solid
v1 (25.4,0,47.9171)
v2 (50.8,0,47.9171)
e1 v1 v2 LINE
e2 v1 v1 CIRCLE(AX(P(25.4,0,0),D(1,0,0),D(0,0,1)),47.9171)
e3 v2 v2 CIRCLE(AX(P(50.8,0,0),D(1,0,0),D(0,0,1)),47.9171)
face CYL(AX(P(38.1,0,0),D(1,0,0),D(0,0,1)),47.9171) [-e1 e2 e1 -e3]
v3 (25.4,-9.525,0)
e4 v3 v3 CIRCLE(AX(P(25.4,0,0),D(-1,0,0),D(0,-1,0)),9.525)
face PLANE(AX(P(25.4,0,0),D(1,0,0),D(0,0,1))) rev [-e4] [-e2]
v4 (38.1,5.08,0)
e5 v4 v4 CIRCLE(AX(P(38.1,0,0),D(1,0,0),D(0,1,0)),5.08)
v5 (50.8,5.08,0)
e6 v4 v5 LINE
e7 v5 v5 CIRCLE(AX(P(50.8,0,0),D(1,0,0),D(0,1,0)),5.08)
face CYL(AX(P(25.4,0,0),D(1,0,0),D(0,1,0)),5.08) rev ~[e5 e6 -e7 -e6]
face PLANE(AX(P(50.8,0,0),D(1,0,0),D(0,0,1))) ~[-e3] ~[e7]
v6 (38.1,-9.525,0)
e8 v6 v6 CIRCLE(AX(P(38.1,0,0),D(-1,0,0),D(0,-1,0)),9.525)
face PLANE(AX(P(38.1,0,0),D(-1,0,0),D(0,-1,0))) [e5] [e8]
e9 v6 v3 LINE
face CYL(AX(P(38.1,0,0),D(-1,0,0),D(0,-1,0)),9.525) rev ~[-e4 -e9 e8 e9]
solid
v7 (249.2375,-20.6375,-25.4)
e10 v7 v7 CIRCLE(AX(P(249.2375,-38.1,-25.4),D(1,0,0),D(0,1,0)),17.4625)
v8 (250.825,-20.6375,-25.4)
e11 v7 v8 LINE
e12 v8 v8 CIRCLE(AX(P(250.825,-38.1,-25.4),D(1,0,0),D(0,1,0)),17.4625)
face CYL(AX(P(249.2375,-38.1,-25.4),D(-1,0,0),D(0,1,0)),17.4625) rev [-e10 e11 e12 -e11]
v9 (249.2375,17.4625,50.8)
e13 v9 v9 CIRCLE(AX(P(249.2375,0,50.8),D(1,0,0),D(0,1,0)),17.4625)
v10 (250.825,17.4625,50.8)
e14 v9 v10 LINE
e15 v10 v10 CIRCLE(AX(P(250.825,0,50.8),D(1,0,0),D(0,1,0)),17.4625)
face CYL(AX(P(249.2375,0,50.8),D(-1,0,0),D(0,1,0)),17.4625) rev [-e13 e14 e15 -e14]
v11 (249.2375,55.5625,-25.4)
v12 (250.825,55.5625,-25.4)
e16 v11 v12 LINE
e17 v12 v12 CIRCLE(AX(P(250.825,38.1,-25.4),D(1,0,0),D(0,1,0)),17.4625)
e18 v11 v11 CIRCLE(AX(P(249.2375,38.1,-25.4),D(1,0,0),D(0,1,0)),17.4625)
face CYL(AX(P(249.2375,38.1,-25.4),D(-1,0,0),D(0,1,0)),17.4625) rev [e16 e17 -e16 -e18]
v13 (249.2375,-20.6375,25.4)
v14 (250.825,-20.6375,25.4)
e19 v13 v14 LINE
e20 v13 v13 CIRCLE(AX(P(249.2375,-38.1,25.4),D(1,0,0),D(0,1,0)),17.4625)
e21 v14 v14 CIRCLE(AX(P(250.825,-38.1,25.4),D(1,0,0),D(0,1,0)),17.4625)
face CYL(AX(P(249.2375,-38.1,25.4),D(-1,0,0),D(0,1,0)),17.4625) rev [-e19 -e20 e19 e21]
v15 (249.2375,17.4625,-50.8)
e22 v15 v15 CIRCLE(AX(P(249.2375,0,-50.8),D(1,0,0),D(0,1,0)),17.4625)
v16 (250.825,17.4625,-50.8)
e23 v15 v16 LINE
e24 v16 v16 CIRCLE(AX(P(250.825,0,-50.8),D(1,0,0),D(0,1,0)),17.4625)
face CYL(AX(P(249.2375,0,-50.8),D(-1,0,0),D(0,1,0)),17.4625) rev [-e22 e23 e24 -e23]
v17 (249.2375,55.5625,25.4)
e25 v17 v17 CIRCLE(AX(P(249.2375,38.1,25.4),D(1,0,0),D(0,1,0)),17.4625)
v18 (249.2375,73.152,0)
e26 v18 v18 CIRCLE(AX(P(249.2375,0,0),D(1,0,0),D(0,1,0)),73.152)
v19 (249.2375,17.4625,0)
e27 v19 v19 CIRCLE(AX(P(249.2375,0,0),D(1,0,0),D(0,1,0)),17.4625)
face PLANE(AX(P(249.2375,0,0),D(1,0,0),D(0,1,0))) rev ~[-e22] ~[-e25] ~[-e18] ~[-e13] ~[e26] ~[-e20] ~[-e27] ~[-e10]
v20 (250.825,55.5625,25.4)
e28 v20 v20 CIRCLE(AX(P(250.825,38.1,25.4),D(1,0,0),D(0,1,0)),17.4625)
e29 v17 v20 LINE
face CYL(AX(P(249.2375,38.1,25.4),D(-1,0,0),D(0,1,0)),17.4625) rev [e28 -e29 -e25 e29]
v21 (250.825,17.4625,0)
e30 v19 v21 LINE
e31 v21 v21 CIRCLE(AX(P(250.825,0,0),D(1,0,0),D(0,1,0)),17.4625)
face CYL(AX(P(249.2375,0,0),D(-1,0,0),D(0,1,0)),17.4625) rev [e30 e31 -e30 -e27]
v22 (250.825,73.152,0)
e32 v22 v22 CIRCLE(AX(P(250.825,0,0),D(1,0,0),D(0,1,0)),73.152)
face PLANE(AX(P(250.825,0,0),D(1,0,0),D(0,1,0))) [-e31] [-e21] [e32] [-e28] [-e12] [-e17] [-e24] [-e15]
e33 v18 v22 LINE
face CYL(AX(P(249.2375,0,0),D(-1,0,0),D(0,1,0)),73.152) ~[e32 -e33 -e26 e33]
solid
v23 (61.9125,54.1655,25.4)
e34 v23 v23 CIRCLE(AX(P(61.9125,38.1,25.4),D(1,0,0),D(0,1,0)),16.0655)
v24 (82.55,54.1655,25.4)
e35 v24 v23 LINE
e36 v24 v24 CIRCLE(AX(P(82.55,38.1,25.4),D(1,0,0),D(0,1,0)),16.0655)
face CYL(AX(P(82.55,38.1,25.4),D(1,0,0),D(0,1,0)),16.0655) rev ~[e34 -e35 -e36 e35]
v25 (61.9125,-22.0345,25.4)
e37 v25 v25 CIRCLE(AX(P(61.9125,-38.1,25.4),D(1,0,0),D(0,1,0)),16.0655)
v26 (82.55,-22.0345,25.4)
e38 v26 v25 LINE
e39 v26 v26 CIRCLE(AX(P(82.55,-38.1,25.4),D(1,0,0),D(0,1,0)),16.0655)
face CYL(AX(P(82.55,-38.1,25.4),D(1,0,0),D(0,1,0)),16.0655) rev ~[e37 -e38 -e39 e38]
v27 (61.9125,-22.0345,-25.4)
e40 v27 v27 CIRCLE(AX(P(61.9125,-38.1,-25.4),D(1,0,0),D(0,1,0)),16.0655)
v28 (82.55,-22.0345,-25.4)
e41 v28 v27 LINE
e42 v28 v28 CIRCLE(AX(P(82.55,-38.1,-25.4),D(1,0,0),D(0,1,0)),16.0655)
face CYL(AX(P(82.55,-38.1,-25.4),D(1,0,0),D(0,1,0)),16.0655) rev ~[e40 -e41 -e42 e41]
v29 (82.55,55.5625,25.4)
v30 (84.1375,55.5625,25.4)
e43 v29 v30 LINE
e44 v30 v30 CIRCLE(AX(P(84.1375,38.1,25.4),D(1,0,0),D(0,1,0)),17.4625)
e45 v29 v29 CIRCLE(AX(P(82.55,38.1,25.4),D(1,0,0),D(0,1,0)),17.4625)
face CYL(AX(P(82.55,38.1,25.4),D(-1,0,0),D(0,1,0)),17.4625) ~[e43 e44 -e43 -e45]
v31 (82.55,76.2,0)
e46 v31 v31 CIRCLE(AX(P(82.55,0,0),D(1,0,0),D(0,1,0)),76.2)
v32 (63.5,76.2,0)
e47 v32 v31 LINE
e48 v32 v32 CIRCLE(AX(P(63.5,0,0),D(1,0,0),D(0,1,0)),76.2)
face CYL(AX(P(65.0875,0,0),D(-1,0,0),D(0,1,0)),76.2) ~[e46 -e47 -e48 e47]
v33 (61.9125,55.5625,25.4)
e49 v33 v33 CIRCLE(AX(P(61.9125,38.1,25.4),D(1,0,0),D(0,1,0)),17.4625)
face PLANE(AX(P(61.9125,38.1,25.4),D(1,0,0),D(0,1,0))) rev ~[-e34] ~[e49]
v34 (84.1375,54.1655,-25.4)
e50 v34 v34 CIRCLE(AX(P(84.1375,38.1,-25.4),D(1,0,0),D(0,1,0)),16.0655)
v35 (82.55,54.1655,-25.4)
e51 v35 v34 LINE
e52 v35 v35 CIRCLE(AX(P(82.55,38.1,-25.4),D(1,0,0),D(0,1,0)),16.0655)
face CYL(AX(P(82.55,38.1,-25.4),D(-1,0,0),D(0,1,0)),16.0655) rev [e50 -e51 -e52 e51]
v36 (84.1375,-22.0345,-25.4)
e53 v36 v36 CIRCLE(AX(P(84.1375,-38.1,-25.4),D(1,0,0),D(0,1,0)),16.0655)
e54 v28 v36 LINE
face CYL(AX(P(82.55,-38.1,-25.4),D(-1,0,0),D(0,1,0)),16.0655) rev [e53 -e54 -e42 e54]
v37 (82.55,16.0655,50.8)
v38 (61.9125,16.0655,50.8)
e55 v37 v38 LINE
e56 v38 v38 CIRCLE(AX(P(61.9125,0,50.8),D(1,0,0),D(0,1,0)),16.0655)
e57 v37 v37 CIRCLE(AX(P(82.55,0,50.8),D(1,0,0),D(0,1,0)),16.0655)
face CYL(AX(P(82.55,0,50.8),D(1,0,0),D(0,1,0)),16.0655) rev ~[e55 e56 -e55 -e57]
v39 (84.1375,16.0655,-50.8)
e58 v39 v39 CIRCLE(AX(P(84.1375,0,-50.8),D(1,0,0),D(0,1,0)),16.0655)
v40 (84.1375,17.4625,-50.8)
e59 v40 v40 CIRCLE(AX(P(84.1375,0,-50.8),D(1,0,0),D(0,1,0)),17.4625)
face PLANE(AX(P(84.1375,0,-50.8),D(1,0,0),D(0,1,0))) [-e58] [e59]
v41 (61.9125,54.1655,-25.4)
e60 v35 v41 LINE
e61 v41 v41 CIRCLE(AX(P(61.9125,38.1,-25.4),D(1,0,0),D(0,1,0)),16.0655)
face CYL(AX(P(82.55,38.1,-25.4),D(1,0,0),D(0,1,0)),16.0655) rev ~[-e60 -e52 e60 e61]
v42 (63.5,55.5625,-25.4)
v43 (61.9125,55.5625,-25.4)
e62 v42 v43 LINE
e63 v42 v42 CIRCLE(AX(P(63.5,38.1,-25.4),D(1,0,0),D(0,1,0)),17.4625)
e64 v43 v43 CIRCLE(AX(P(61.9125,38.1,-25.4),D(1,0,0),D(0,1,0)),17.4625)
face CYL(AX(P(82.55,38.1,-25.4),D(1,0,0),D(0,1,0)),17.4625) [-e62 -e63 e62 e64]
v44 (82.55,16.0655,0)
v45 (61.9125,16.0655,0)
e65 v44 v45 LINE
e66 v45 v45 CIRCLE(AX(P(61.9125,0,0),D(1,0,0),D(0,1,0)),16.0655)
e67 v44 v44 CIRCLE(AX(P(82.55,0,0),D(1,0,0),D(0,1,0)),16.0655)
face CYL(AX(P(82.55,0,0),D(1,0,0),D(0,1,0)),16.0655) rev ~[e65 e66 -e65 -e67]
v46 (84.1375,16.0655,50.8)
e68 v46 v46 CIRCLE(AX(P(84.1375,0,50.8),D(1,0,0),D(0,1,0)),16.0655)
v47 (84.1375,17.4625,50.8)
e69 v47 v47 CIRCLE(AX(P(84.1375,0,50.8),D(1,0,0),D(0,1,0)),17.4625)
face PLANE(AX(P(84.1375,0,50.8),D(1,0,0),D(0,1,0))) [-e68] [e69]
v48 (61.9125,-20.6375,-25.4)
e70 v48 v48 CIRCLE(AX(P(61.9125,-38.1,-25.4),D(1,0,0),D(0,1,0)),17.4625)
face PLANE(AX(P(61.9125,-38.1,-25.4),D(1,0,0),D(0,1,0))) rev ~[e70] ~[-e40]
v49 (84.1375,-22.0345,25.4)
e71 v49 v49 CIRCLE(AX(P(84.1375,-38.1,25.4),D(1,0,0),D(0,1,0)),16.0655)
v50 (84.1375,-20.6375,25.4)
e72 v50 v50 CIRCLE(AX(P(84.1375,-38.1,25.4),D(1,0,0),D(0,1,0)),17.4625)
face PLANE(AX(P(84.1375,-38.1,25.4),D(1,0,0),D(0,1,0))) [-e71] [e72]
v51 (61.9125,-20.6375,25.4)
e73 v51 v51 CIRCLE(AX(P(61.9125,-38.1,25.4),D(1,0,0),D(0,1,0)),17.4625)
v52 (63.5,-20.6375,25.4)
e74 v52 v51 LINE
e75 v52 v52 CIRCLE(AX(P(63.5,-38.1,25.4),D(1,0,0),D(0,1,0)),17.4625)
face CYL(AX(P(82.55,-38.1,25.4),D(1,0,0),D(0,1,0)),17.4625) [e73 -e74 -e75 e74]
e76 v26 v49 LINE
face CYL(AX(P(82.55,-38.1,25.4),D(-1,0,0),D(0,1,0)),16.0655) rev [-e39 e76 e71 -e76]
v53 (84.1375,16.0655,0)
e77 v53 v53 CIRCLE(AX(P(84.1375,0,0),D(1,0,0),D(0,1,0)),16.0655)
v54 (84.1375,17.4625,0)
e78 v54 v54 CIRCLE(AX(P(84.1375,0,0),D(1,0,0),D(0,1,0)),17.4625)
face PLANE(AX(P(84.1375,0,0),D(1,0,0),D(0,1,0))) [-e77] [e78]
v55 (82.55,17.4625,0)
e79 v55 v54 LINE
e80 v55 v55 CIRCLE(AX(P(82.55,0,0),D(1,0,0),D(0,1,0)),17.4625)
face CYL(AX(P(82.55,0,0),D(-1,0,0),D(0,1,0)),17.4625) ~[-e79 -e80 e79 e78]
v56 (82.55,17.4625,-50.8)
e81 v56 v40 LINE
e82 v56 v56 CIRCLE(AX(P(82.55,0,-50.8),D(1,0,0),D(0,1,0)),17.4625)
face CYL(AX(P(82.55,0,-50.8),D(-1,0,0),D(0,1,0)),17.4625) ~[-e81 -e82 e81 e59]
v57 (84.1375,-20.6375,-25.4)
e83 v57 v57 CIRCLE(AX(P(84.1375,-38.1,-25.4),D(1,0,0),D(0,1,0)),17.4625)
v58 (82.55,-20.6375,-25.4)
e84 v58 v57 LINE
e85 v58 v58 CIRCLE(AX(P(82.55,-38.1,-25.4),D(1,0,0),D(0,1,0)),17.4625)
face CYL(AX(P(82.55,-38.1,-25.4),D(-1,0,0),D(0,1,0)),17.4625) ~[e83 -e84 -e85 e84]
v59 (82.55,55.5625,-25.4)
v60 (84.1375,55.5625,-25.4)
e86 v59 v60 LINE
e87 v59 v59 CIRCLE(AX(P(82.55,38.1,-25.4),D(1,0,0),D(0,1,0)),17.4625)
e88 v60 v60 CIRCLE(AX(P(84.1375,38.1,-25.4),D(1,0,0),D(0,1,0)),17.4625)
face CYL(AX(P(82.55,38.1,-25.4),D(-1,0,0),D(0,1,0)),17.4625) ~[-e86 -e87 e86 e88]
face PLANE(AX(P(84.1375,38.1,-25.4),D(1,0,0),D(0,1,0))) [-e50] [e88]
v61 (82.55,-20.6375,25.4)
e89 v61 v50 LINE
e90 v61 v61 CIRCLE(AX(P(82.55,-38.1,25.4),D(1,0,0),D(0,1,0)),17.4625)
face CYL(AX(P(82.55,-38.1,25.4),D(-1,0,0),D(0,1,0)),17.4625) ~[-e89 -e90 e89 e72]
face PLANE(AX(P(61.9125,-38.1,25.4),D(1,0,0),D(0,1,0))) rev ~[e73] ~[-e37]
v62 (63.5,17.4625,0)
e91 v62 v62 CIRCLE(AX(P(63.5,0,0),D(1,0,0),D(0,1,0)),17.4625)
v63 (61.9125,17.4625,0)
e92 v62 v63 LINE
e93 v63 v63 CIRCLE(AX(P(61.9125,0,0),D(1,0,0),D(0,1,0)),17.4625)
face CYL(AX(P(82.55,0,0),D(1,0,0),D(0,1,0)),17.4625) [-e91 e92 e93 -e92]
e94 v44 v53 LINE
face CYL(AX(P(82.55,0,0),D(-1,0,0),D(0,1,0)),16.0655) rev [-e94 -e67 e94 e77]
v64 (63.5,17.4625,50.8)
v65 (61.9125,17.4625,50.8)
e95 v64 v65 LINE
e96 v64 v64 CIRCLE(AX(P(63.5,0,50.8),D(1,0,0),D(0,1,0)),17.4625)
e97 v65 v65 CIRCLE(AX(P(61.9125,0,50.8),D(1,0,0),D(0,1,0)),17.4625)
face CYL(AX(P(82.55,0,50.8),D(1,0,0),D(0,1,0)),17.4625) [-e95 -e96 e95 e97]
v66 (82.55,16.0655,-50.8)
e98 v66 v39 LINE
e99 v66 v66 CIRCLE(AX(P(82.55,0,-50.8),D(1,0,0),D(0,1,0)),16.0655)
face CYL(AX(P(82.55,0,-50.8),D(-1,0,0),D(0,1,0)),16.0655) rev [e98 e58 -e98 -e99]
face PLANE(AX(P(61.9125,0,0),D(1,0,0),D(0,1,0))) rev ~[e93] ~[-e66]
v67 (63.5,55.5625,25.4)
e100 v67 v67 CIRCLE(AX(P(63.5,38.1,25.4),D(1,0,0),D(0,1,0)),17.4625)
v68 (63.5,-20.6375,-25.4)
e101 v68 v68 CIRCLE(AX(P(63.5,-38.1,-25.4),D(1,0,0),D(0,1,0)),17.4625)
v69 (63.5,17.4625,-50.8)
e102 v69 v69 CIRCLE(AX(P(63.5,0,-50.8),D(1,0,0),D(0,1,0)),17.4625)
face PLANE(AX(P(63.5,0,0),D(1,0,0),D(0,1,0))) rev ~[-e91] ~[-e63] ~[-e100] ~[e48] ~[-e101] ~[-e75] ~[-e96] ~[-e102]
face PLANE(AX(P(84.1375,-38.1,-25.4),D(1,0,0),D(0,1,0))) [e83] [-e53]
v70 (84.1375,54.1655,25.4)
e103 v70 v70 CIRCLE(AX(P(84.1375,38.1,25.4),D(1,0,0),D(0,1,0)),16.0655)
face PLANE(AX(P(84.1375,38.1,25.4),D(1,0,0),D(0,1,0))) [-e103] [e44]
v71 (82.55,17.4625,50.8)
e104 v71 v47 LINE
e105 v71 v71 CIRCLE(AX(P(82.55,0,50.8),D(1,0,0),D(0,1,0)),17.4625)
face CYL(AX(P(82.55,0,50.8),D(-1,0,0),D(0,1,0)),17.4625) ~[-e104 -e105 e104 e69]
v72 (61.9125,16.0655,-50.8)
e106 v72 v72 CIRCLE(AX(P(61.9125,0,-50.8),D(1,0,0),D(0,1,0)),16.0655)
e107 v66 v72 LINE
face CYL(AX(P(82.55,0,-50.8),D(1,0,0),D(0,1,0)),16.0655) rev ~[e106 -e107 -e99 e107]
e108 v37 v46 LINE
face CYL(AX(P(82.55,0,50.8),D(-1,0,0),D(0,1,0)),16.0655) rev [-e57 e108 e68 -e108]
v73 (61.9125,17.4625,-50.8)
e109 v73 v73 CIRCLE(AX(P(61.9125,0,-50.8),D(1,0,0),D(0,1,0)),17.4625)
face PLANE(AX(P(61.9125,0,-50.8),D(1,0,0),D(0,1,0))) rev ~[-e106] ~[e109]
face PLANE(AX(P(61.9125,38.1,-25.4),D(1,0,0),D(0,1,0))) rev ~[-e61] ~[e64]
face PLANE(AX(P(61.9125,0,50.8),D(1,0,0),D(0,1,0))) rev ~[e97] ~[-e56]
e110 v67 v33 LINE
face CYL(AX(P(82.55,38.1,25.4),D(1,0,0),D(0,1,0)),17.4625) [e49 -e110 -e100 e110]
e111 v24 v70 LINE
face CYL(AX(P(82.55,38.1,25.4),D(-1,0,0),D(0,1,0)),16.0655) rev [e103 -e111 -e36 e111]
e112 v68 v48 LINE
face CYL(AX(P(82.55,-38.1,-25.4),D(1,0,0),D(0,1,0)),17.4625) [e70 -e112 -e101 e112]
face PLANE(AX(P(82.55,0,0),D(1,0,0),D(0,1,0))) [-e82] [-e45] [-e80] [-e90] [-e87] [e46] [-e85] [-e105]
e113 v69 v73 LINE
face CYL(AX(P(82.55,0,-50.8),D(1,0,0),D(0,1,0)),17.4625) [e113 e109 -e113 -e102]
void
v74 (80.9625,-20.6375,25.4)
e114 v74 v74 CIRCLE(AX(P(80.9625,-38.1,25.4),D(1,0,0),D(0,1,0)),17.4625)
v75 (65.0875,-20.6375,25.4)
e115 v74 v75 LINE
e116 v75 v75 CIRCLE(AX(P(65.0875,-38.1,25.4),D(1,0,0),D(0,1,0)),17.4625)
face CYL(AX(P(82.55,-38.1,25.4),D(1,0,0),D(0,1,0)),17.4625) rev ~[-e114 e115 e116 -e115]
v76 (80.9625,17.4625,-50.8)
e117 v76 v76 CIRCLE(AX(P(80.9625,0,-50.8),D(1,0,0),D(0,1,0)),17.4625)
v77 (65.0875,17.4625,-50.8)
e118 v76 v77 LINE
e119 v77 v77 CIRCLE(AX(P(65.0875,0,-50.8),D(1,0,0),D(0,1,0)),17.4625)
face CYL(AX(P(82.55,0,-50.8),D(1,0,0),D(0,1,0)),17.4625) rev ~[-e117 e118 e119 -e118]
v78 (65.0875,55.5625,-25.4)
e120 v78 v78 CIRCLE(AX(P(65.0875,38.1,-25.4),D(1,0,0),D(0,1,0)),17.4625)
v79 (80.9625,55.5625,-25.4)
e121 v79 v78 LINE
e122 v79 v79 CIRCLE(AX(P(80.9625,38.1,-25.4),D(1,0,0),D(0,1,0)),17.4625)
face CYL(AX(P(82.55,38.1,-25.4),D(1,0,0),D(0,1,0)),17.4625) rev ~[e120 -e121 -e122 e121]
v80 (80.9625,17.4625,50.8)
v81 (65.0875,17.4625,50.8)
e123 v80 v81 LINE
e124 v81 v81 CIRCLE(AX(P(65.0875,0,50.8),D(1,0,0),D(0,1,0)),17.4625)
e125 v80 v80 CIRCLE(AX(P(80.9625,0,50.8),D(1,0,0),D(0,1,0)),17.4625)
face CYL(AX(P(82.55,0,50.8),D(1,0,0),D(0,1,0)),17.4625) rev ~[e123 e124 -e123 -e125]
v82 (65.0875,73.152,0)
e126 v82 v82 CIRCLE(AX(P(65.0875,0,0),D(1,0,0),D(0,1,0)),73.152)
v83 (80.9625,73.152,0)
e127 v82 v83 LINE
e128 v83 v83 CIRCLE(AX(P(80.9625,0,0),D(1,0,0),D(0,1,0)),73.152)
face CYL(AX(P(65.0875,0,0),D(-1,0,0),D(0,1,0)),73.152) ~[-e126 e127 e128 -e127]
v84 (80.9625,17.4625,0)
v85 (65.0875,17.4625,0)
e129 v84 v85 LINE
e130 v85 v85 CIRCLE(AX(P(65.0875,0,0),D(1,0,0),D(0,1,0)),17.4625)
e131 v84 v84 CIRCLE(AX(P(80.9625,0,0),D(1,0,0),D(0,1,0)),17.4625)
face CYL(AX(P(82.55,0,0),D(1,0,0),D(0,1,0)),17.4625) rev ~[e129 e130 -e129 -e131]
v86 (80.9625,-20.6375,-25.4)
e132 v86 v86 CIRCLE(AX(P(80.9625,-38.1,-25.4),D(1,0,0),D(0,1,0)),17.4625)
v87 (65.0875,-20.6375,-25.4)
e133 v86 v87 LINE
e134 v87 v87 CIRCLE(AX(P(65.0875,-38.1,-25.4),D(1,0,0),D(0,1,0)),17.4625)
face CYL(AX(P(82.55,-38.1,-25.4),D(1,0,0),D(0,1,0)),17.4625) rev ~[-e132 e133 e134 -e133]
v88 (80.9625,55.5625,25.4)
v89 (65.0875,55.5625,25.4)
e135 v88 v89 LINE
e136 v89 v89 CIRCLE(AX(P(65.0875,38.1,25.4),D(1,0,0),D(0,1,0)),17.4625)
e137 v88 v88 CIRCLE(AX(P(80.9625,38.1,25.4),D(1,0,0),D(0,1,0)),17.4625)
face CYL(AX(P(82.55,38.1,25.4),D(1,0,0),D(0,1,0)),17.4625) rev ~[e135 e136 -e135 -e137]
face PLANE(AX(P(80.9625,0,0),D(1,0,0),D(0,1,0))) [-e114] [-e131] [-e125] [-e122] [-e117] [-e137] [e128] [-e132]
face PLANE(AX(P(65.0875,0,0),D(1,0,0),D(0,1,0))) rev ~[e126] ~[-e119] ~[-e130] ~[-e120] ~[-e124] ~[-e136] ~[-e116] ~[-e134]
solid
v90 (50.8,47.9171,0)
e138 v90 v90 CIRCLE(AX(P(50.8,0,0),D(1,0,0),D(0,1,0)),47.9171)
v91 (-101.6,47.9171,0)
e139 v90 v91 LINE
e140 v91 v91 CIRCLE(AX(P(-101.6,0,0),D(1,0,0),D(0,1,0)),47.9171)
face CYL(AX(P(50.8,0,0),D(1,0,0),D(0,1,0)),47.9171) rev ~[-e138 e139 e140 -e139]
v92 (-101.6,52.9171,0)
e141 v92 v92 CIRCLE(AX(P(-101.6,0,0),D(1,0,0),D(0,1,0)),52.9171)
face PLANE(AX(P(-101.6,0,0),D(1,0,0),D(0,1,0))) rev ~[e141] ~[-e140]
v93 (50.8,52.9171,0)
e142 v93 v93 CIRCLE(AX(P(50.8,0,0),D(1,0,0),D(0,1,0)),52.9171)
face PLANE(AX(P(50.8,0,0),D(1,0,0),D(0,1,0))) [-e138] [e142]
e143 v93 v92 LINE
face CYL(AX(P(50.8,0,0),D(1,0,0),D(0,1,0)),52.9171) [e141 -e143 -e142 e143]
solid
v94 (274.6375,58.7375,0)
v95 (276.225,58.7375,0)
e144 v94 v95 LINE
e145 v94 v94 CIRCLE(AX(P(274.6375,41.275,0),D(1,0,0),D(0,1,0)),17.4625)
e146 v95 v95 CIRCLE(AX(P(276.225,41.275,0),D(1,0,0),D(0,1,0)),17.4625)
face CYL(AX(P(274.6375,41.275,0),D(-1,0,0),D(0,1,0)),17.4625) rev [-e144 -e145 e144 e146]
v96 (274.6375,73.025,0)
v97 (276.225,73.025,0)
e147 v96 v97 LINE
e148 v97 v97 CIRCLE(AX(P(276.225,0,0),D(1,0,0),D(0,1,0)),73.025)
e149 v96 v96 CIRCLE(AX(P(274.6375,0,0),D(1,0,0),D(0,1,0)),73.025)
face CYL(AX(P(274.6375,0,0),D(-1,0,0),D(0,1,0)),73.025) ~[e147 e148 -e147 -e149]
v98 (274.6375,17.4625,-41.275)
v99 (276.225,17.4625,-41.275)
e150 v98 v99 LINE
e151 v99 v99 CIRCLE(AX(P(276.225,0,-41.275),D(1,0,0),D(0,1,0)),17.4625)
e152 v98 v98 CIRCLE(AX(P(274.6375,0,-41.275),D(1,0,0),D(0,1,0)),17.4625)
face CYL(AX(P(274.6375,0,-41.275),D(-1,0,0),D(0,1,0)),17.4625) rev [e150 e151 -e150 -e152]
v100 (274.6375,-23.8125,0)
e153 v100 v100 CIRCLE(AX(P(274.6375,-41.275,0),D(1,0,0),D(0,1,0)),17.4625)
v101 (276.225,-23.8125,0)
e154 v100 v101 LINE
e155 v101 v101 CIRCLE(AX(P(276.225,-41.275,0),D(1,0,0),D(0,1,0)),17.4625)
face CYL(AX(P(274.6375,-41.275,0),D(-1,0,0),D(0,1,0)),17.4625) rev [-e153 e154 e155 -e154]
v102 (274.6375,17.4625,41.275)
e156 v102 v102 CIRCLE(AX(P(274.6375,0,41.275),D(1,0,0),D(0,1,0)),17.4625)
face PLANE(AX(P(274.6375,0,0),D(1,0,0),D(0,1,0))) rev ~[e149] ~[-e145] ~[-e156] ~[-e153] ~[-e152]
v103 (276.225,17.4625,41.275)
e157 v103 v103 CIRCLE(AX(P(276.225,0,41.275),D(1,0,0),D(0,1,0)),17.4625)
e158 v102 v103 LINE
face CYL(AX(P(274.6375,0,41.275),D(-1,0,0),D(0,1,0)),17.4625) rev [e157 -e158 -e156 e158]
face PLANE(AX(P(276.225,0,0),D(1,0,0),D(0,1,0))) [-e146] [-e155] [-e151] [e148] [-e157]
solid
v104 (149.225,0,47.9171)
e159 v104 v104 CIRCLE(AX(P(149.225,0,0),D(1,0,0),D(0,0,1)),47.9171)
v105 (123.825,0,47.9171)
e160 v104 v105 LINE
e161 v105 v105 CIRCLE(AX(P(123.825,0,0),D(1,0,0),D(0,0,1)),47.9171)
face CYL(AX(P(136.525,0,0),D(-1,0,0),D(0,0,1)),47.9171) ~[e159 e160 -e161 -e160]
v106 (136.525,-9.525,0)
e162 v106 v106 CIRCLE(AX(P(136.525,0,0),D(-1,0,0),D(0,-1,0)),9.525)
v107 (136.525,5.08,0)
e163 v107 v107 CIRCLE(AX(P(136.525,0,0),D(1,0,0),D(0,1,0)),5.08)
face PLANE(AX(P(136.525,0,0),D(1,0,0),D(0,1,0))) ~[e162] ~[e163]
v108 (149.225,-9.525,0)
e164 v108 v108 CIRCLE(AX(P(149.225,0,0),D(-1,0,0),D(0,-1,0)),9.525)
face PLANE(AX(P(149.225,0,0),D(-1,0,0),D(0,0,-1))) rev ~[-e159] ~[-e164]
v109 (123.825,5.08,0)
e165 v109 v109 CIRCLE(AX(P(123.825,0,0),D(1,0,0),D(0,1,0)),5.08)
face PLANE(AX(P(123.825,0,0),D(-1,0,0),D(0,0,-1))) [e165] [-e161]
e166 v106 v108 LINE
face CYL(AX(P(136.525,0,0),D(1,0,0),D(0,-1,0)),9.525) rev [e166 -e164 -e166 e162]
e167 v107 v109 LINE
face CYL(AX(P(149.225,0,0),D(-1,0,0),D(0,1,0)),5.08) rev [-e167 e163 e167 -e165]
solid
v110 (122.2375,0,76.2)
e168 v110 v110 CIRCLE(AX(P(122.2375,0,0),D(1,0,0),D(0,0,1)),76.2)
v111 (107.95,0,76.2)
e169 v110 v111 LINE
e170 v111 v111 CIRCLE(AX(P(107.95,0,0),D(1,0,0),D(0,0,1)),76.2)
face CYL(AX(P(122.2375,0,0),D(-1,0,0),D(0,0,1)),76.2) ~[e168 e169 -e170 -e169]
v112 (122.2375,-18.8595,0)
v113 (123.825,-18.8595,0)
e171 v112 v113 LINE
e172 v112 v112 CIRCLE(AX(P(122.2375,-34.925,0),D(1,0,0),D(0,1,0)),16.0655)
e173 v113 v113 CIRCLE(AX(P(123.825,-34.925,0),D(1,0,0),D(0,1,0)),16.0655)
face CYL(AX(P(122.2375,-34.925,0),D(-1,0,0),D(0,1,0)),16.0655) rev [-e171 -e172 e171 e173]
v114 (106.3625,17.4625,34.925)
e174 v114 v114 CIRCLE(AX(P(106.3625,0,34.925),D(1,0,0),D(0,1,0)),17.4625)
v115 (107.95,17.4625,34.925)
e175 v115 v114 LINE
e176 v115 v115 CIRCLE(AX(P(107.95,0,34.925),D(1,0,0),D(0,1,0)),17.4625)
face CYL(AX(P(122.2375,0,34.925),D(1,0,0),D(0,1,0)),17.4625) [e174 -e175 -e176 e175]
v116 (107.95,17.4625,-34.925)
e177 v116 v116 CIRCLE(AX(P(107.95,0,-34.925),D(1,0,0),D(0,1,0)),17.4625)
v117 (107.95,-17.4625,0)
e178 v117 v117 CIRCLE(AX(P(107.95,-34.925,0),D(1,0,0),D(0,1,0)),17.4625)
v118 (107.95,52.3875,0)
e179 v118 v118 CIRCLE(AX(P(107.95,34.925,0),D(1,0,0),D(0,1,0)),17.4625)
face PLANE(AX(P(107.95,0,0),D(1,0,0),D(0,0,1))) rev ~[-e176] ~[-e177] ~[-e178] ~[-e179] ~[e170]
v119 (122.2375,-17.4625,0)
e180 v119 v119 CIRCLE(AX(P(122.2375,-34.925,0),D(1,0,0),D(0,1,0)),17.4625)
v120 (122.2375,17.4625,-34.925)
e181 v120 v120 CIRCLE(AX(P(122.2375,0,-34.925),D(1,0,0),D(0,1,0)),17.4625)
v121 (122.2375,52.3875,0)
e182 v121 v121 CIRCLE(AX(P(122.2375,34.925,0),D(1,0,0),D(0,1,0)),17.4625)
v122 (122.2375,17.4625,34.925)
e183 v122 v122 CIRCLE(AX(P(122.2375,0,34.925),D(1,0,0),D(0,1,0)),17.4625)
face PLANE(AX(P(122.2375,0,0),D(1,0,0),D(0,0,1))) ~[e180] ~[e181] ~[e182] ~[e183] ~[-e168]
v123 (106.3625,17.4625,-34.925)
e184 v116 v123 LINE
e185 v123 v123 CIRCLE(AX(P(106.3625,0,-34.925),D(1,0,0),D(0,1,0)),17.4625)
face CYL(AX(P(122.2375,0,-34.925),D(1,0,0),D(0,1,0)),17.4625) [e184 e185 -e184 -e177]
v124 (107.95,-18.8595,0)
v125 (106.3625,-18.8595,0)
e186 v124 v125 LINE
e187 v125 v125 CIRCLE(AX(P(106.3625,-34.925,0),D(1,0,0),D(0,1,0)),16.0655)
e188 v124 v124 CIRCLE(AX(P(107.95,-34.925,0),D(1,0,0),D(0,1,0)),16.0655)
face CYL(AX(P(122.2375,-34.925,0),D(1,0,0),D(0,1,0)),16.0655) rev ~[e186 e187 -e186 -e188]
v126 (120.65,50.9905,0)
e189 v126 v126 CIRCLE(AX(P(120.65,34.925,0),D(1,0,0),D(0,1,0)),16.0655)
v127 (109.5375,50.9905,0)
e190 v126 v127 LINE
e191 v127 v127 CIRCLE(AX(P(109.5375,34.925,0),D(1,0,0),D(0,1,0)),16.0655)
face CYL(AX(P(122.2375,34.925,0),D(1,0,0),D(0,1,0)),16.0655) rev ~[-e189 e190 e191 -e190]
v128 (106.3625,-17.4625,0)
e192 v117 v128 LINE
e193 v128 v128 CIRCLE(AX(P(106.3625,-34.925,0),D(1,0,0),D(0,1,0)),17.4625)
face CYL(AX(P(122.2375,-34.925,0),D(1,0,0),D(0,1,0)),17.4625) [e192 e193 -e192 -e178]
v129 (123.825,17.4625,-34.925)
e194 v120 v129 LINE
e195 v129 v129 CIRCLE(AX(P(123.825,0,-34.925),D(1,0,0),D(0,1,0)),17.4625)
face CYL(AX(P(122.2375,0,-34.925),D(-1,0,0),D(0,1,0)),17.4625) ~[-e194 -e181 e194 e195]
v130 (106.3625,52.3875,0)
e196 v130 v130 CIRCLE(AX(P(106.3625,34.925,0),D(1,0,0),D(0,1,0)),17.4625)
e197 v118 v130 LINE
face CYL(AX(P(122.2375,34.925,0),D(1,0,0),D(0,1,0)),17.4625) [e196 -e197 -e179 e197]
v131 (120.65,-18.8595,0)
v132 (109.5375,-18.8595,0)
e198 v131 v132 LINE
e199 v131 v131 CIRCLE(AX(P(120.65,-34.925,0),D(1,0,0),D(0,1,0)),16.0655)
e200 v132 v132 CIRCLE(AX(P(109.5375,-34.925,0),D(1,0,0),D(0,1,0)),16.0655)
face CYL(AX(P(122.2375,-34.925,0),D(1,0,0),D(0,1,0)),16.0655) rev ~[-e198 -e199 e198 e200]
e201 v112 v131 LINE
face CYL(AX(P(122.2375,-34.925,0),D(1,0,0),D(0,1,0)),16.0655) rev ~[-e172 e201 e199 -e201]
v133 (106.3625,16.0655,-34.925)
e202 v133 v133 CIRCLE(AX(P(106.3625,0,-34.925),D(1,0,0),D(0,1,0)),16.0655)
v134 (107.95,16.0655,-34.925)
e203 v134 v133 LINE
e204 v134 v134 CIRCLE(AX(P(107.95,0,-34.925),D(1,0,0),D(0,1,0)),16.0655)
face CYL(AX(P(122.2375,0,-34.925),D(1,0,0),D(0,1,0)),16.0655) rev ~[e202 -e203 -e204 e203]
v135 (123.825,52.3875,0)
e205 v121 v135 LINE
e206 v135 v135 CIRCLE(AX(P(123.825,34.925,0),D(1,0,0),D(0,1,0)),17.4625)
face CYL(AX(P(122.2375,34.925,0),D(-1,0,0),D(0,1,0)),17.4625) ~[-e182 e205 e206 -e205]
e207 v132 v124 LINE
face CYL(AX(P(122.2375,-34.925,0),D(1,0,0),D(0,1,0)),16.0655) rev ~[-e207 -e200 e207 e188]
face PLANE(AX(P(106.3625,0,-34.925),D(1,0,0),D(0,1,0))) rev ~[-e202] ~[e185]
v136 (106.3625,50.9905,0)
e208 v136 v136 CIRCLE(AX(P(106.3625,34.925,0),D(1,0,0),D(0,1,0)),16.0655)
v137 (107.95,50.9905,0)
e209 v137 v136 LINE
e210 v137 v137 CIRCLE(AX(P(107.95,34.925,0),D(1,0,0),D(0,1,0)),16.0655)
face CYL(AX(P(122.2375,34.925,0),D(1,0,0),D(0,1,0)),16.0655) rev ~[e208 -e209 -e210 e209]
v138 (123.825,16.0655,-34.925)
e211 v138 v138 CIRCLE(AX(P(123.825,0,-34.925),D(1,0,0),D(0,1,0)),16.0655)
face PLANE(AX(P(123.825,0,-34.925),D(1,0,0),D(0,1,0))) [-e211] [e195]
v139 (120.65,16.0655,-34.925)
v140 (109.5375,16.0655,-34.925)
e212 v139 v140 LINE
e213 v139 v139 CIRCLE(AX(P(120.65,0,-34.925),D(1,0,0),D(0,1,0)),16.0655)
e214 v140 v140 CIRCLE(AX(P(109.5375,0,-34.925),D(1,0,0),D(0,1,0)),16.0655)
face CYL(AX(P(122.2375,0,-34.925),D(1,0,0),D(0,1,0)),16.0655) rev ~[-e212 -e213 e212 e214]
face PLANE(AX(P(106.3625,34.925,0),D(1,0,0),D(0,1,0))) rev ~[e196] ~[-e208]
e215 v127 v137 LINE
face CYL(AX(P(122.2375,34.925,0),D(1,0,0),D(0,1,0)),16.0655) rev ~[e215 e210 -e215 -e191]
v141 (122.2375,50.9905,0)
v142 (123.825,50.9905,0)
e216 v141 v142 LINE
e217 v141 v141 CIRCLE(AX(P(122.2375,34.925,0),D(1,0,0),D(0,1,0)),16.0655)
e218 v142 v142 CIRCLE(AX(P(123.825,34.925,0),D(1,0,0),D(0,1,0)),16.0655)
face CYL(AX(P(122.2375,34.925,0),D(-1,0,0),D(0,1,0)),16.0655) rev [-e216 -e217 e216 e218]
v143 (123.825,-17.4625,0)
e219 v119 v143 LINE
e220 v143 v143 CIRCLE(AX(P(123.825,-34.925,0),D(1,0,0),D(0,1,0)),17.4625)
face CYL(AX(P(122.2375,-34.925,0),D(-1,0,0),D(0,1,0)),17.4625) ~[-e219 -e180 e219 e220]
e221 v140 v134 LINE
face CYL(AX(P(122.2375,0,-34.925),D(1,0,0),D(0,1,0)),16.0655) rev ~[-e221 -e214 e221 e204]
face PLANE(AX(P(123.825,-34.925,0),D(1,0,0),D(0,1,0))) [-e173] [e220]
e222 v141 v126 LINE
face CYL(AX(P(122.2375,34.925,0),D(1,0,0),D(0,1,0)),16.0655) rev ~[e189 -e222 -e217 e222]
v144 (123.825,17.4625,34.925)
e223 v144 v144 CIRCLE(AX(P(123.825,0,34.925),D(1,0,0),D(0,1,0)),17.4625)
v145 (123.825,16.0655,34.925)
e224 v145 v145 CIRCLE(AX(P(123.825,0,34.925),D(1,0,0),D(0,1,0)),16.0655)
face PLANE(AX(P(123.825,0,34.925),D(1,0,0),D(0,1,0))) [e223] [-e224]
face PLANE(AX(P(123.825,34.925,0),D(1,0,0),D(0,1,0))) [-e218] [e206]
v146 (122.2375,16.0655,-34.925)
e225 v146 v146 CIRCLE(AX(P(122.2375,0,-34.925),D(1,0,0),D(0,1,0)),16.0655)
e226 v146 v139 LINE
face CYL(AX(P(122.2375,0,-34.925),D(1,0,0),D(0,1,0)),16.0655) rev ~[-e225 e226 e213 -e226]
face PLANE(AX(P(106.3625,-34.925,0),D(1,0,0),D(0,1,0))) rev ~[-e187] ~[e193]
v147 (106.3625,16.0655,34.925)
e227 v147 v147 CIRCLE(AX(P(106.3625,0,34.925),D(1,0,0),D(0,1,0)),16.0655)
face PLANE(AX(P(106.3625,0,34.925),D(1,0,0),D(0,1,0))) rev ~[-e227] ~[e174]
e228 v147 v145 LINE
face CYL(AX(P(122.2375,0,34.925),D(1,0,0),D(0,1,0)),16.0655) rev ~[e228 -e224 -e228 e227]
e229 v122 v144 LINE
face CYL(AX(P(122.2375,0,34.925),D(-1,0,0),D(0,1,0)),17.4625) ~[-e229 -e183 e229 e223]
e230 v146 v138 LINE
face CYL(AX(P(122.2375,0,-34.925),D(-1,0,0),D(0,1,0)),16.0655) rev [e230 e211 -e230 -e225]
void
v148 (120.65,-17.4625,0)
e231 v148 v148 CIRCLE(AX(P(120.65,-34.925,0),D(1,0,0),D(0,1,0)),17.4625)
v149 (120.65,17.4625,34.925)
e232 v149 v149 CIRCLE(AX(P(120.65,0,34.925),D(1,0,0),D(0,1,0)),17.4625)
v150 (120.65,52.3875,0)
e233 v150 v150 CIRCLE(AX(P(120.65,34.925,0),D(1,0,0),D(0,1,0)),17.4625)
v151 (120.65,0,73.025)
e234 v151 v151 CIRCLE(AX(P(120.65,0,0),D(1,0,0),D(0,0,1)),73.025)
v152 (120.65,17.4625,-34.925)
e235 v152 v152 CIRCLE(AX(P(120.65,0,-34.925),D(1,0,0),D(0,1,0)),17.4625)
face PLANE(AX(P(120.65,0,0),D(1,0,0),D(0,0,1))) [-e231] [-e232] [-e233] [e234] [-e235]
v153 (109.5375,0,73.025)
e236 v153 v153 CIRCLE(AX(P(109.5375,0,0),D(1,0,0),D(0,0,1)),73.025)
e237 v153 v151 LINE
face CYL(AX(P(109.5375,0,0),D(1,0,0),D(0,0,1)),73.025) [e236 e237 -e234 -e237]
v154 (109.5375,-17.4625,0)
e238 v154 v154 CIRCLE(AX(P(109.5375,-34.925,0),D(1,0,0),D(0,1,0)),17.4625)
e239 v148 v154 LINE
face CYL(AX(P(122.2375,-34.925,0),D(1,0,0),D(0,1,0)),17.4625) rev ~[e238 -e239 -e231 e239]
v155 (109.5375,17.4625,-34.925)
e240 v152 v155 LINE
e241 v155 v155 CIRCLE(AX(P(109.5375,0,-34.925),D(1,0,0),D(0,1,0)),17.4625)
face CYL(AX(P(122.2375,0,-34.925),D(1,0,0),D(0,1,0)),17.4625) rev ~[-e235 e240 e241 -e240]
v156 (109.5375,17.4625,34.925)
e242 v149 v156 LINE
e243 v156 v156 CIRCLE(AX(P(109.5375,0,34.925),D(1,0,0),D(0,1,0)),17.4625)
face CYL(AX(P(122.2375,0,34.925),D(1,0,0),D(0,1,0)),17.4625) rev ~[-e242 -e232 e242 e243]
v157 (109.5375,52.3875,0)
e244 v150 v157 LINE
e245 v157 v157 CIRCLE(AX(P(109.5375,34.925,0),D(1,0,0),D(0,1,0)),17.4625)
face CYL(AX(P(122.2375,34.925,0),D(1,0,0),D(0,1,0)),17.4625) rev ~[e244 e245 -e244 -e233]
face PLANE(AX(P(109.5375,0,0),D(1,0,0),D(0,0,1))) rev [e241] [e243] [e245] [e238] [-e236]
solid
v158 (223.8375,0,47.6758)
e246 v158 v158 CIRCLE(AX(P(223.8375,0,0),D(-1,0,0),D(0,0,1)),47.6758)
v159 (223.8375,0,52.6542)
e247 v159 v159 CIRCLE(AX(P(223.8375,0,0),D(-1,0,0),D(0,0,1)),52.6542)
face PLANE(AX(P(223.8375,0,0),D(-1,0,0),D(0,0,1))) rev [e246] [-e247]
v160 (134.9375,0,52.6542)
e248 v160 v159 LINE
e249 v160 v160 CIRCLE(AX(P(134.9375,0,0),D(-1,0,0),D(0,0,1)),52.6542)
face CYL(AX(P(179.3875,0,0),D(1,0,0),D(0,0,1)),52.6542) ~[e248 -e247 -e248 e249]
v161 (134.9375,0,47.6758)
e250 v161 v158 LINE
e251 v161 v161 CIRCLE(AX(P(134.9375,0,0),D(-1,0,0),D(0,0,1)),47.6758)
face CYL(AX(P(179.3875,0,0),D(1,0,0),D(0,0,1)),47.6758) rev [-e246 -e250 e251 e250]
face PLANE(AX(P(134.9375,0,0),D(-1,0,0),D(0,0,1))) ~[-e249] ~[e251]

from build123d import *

# Parameters (mm, degrees)
F0_W            = 25.4
F0_H            = 47.9171
F2_R            = 52.9171
F2_R_2          = 47.9171
F3_DEPTH        = 152.4
F5_R            = 76.2
F5_R_2          = 17.4625
F7_DEPTH        = 1.5875
F8_R            = 76.2
F8_R_2          = 73.152
F9_DEPTH        = 17.4625
F10_R           = 73.152
F10_R_2         = 17.4625
F11_DEPTH       = 1.5875
F12_R           = 17.4625
F12_R_2         = 16.0655
F13_DEPTH       = 1.5875
F13_DEPTH_BACK  = 20.6375
F15_D           = 10.16
F15_CBORE_D     = 19.05
F15_CBORE_DEPTH = 12.7
F20_R           = 16.0655
F21_DEPTH       = 14.2875
F20_R_2         = 17.4625
F22_DEPTH       = 1.5875
F22_DEPTH_BACK  = 15.875
F23_W           = 88.9
F23_H           = 4.9784
F26_R           = 73.152
F26_R_2         = 17.4625
F27_DEPTH       = 1.5875
F29_R           = 73.025
F29_R_2         = 17.4625
F30_DEPTH       = 1.5875


# Not quite as in the source:
# - a length typed as a fraction of an inch, garbled in the dataset ("3 / 203.2 mm" for 3/8 in), is restored
# - a feature names something its author has since deleted; it is built from what else it names
# - the program builds the solid bodies; features that only make, move or delete a surface that nothing else refers to are left out


with BuildPart() as f1:
    # F0 (on Front) → F1 (revolve)
    with BuildSketch(Plane.XZ):
        with Locations((38.1, 23.95855)):
            Rectangle(F0_W, F0_H)
    revolve(axis=Axis((-5.279654984, 0, 0), (1, 0, 0)))

    # F15 (through all)
    with Locations(Plane(origin=(25.4, 0, 0), x_dir=(0, -1, 0), z_dir=(-1, 0, 0))):
        with Locations((0, 0)):
            CounterBoreHole(F15_D / 2, F15_CBORE_D / 2, F15_CBORE_DEPTH)


with BuildPart() as f3:
    # F2 (on face) → F3 (new body)
    with BuildSketch(Plane.YZ.offset(50.8)):
        Circle(F2_R)
        Circle(F2_R_2, mode=Mode.SUBTRACT)
    extrude(amount=-F3_DEPTH)


with BuildPart() as f7:
    # F5 (on offset) → F7 (new body)
    with BuildSketch(Plane.YZ.offset(63.5)):
        Circle(F5_R)
        with Locations((-38.1, -25.4)):
            Circle(F5_R_2, mode=Mode.SUBTRACT)
        with Locations((0, -50.8)):
            Circle(F5_R_2, mode=Mode.SUBTRACT)
        with Locations((38.1, -25.4)):
            Circle(F5_R_2, mode=Mode.SUBTRACT)
        with Locations((-38.1, 25.4)):
            Circle(F5_R_2, mode=Mode.SUBTRACT)
        Circle(F5_R_2, mode=Mode.SUBTRACT)
        with Locations((38.1, 25.4)):
            Circle(F5_R_2, mode=Mode.SUBTRACT)
        with Locations((0, 50.8)):
            Circle(F5_R_2, mode=Mode.SUBTRACT)
    extrude(amount=F7_DEPTH)

    # F8 (on face) → F9 (join)
    with BuildSketch(Plane.YZ.offset(65.0875)):
        Circle(F8_R)
        Circle(F8_R_2, mode=Mode.SUBTRACT)
    extrude(amount=F9_DEPTH)

    # F10 (on face) → F11 (join)
    with BuildSketch(Plane.YZ.offset(82.55)):
        Circle(F10_R)
        with Locations((-38.1, -25.4)):
            Circle(F10_R_2, mode=Mode.SUBTRACT)
        with Locations((0, -50.8)):
            Circle(F10_R_2, mode=Mode.SUBTRACT)
        with Locations((38.1, -25.4)):
            Circle(F10_R_2, mode=Mode.SUBTRACT)
        with Locations((-38.1, 25.4)):
            Circle(F10_R_2, mode=Mode.SUBTRACT)
        Circle(F10_R_2, mode=Mode.SUBTRACT)
        with Locations((38.1, 25.4)):
            Circle(F10_R_2, mode=Mode.SUBTRACT)
        with Locations((0, 50.8)):
            Circle(F10_R_2, mode=Mode.SUBTRACT)
    extrude(amount=-F11_DEPTH)

    # F12 (on face) → F13 (join, two sides)
    with BuildSketch(Plane.YZ.offset(82.55)) as f13_sk:
        Circle(F12_R)
        Circle(F12_R_2, mode=Mode.SUBTRACT)
        with Locations((-38.1, 25.4)):
            Circle(F12_R)
        with Locations((-38.1, 25.4)):
            Circle(F12_R_2, mode=Mode.SUBTRACT)
        with Locations((0, 50.8)):
            Circle(F12_R)
        with Locations((0, 50.8)):
            Circle(F12_R_2, mode=Mode.SUBTRACT)
        with Locations((38.1, 25.4)):
            Circle(F12_R)
        with Locations((38.1, 25.4)):
            Circle(F12_R_2, mode=Mode.SUBTRACT)
        with Locations((38.1, -25.4)):
            Circle(F12_R)
        with Locations((38.1, -25.4)):
            Circle(F12_R_2, mode=Mode.SUBTRACT)
        with Locations((0, -50.8)):
            Circle(F12_R)
        with Locations((0, -50.8)):
            Circle(F12_R_2, mode=Mode.SUBTRACT)
        with Locations((-38.1, -25.4)):
            Circle(F12_R)
        with Locations((-38.1, -25.4)):
            Circle(F12_R_2, mode=Mode.SUBTRACT)
    extrude(amount=F13_DEPTH)
    extrude(f13_sk.sketch, amount=-F13_DEPTH_BACK)


with BuildPart() as f17_1:
    # F17: instance of F1
    add(f1.part.mirror(Plane.YZ.offset(87.3125)))


with BuildPart() as f19:
    # F18 (on Front) → F19 (revolve)
    with BuildSketch(Plane.XZ):
        Polygon((107.95, 76.2), (107.95, 0), (109.5375, 0), (109.5375, 73.025), (120.65, 73.025), (120.65, 0), (122.2375, 0), (122.2375, 76.2), align=None)
    revolve(axis=Axis((197.1038290552, 0, 0), (1, 0, 0)))

    # F20 (on face) → F21 (cut, through all)
    with BuildSketch(Plane.YZ.offset(122.2375)):
        with Locations((0, 34.925)):
            Circle(F20_R)
        with Locations((-34.925, 0)):
            Circle(F20_R)
        with Locations((0, -34.925)):
            Circle(F20_R)
        with Locations((34.925, 0)):
            Circle(F20_R)
    extrude(amount=-F21_DEPTH, mode=Mode.SUBTRACT)

    # F20 (on face) → F22 (join, two sides)
    with BuildSketch(Plane.YZ.offset(122.2375)) as f22_sk:
        with Locations((0, 34.925)):
            Circle(F20_R_2)
        with Locations((0, 34.925)):
            Circle(F20_R, mode=Mode.SUBTRACT)
        with Locations((34.925, 0)):
            Circle(F20_R_2)
        with Locations((34.925, 0)):
            Circle(F20_R, mode=Mode.SUBTRACT)
        with Locations((0, -34.925)):
            Circle(F20_R_2)
        with Locations((0, -34.925)):
            Circle(F20_R, mode=Mode.SUBTRACT)
        with Locations((-34.925, 0)):
            Circle(F20_R_2)
        with Locations((-34.925, 0)):
            Circle(F20_R, mode=Mode.SUBTRACT)
    extrude(amount=F22_DEPTH)
    extrude(f22_sk.sketch, amount=-F22_DEPTH_BACK)


with BuildPart() as f24:
    # F23 (on Front) → F24 (revolve)
    with BuildSketch(Plane.XZ):
        with Locations((179.3875, 50.165)):
            Rectangle(F23_W, F23_H)
    revolve(axis=Axis((95.0557777543, 0, 0), (-1, 0, 0)))


with BuildPart() as f27:
    # F26 (on offset) → F27 (new body)
    with BuildSketch(Plane.YZ.offset(249.2375)):
        Circle(F26_R)
        with Locations((-38.1, -25.4)):
            Circle(F26_R_2, mode=Mode.SUBTRACT)
        with Locations((0, -50.8)):
            Circle(F26_R_2, mode=Mode.SUBTRACT)
        with Locations((38.1, -25.4)):
            Circle(F26_R_2, mode=Mode.SUBTRACT)
        with Locations((-38.1, 25.4)):
            Circle(F26_R_2, mode=Mode.SUBTRACT)
        Circle(F26_R_2, mode=Mode.SUBTRACT)
        with Locations((38.1, 25.4)):
            Circle(F26_R_2, mode=Mode.SUBTRACT)
        with Locations((0, 50.8)):
            Circle(F26_R_2, mode=Mode.SUBTRACT)
    extrude(amount=F27_DEPTH)


with BuildPart() as f30:
    # F29 (on offset) → F30 (new body)
    with BuildSketch(Plane.YZ.offset(274.6375)):
        Circle(F29_R)
        with Locations((0, -41.275)):
            Circle(F29_R_2, mode=Mode.SUBTRACT)
        with Locations((-41.275, 0)):
            Circle(F29_R_2, mode=Mode.SUBTRACT)
        with Locations((41.275, 0)):
            Circle(F29_R_2, mode=Mode.SUBTRACT)
        with Locations((0, 41.275)):
            Circle(F29_R_2, mode=Mode.SUBTRACT)
    extrude(amount=F30_DEPTH)


solid = Compound([f1.part, f3.part, f7.part, f17_1.part, f19.part, f24.part, f27.part, f30.part])
